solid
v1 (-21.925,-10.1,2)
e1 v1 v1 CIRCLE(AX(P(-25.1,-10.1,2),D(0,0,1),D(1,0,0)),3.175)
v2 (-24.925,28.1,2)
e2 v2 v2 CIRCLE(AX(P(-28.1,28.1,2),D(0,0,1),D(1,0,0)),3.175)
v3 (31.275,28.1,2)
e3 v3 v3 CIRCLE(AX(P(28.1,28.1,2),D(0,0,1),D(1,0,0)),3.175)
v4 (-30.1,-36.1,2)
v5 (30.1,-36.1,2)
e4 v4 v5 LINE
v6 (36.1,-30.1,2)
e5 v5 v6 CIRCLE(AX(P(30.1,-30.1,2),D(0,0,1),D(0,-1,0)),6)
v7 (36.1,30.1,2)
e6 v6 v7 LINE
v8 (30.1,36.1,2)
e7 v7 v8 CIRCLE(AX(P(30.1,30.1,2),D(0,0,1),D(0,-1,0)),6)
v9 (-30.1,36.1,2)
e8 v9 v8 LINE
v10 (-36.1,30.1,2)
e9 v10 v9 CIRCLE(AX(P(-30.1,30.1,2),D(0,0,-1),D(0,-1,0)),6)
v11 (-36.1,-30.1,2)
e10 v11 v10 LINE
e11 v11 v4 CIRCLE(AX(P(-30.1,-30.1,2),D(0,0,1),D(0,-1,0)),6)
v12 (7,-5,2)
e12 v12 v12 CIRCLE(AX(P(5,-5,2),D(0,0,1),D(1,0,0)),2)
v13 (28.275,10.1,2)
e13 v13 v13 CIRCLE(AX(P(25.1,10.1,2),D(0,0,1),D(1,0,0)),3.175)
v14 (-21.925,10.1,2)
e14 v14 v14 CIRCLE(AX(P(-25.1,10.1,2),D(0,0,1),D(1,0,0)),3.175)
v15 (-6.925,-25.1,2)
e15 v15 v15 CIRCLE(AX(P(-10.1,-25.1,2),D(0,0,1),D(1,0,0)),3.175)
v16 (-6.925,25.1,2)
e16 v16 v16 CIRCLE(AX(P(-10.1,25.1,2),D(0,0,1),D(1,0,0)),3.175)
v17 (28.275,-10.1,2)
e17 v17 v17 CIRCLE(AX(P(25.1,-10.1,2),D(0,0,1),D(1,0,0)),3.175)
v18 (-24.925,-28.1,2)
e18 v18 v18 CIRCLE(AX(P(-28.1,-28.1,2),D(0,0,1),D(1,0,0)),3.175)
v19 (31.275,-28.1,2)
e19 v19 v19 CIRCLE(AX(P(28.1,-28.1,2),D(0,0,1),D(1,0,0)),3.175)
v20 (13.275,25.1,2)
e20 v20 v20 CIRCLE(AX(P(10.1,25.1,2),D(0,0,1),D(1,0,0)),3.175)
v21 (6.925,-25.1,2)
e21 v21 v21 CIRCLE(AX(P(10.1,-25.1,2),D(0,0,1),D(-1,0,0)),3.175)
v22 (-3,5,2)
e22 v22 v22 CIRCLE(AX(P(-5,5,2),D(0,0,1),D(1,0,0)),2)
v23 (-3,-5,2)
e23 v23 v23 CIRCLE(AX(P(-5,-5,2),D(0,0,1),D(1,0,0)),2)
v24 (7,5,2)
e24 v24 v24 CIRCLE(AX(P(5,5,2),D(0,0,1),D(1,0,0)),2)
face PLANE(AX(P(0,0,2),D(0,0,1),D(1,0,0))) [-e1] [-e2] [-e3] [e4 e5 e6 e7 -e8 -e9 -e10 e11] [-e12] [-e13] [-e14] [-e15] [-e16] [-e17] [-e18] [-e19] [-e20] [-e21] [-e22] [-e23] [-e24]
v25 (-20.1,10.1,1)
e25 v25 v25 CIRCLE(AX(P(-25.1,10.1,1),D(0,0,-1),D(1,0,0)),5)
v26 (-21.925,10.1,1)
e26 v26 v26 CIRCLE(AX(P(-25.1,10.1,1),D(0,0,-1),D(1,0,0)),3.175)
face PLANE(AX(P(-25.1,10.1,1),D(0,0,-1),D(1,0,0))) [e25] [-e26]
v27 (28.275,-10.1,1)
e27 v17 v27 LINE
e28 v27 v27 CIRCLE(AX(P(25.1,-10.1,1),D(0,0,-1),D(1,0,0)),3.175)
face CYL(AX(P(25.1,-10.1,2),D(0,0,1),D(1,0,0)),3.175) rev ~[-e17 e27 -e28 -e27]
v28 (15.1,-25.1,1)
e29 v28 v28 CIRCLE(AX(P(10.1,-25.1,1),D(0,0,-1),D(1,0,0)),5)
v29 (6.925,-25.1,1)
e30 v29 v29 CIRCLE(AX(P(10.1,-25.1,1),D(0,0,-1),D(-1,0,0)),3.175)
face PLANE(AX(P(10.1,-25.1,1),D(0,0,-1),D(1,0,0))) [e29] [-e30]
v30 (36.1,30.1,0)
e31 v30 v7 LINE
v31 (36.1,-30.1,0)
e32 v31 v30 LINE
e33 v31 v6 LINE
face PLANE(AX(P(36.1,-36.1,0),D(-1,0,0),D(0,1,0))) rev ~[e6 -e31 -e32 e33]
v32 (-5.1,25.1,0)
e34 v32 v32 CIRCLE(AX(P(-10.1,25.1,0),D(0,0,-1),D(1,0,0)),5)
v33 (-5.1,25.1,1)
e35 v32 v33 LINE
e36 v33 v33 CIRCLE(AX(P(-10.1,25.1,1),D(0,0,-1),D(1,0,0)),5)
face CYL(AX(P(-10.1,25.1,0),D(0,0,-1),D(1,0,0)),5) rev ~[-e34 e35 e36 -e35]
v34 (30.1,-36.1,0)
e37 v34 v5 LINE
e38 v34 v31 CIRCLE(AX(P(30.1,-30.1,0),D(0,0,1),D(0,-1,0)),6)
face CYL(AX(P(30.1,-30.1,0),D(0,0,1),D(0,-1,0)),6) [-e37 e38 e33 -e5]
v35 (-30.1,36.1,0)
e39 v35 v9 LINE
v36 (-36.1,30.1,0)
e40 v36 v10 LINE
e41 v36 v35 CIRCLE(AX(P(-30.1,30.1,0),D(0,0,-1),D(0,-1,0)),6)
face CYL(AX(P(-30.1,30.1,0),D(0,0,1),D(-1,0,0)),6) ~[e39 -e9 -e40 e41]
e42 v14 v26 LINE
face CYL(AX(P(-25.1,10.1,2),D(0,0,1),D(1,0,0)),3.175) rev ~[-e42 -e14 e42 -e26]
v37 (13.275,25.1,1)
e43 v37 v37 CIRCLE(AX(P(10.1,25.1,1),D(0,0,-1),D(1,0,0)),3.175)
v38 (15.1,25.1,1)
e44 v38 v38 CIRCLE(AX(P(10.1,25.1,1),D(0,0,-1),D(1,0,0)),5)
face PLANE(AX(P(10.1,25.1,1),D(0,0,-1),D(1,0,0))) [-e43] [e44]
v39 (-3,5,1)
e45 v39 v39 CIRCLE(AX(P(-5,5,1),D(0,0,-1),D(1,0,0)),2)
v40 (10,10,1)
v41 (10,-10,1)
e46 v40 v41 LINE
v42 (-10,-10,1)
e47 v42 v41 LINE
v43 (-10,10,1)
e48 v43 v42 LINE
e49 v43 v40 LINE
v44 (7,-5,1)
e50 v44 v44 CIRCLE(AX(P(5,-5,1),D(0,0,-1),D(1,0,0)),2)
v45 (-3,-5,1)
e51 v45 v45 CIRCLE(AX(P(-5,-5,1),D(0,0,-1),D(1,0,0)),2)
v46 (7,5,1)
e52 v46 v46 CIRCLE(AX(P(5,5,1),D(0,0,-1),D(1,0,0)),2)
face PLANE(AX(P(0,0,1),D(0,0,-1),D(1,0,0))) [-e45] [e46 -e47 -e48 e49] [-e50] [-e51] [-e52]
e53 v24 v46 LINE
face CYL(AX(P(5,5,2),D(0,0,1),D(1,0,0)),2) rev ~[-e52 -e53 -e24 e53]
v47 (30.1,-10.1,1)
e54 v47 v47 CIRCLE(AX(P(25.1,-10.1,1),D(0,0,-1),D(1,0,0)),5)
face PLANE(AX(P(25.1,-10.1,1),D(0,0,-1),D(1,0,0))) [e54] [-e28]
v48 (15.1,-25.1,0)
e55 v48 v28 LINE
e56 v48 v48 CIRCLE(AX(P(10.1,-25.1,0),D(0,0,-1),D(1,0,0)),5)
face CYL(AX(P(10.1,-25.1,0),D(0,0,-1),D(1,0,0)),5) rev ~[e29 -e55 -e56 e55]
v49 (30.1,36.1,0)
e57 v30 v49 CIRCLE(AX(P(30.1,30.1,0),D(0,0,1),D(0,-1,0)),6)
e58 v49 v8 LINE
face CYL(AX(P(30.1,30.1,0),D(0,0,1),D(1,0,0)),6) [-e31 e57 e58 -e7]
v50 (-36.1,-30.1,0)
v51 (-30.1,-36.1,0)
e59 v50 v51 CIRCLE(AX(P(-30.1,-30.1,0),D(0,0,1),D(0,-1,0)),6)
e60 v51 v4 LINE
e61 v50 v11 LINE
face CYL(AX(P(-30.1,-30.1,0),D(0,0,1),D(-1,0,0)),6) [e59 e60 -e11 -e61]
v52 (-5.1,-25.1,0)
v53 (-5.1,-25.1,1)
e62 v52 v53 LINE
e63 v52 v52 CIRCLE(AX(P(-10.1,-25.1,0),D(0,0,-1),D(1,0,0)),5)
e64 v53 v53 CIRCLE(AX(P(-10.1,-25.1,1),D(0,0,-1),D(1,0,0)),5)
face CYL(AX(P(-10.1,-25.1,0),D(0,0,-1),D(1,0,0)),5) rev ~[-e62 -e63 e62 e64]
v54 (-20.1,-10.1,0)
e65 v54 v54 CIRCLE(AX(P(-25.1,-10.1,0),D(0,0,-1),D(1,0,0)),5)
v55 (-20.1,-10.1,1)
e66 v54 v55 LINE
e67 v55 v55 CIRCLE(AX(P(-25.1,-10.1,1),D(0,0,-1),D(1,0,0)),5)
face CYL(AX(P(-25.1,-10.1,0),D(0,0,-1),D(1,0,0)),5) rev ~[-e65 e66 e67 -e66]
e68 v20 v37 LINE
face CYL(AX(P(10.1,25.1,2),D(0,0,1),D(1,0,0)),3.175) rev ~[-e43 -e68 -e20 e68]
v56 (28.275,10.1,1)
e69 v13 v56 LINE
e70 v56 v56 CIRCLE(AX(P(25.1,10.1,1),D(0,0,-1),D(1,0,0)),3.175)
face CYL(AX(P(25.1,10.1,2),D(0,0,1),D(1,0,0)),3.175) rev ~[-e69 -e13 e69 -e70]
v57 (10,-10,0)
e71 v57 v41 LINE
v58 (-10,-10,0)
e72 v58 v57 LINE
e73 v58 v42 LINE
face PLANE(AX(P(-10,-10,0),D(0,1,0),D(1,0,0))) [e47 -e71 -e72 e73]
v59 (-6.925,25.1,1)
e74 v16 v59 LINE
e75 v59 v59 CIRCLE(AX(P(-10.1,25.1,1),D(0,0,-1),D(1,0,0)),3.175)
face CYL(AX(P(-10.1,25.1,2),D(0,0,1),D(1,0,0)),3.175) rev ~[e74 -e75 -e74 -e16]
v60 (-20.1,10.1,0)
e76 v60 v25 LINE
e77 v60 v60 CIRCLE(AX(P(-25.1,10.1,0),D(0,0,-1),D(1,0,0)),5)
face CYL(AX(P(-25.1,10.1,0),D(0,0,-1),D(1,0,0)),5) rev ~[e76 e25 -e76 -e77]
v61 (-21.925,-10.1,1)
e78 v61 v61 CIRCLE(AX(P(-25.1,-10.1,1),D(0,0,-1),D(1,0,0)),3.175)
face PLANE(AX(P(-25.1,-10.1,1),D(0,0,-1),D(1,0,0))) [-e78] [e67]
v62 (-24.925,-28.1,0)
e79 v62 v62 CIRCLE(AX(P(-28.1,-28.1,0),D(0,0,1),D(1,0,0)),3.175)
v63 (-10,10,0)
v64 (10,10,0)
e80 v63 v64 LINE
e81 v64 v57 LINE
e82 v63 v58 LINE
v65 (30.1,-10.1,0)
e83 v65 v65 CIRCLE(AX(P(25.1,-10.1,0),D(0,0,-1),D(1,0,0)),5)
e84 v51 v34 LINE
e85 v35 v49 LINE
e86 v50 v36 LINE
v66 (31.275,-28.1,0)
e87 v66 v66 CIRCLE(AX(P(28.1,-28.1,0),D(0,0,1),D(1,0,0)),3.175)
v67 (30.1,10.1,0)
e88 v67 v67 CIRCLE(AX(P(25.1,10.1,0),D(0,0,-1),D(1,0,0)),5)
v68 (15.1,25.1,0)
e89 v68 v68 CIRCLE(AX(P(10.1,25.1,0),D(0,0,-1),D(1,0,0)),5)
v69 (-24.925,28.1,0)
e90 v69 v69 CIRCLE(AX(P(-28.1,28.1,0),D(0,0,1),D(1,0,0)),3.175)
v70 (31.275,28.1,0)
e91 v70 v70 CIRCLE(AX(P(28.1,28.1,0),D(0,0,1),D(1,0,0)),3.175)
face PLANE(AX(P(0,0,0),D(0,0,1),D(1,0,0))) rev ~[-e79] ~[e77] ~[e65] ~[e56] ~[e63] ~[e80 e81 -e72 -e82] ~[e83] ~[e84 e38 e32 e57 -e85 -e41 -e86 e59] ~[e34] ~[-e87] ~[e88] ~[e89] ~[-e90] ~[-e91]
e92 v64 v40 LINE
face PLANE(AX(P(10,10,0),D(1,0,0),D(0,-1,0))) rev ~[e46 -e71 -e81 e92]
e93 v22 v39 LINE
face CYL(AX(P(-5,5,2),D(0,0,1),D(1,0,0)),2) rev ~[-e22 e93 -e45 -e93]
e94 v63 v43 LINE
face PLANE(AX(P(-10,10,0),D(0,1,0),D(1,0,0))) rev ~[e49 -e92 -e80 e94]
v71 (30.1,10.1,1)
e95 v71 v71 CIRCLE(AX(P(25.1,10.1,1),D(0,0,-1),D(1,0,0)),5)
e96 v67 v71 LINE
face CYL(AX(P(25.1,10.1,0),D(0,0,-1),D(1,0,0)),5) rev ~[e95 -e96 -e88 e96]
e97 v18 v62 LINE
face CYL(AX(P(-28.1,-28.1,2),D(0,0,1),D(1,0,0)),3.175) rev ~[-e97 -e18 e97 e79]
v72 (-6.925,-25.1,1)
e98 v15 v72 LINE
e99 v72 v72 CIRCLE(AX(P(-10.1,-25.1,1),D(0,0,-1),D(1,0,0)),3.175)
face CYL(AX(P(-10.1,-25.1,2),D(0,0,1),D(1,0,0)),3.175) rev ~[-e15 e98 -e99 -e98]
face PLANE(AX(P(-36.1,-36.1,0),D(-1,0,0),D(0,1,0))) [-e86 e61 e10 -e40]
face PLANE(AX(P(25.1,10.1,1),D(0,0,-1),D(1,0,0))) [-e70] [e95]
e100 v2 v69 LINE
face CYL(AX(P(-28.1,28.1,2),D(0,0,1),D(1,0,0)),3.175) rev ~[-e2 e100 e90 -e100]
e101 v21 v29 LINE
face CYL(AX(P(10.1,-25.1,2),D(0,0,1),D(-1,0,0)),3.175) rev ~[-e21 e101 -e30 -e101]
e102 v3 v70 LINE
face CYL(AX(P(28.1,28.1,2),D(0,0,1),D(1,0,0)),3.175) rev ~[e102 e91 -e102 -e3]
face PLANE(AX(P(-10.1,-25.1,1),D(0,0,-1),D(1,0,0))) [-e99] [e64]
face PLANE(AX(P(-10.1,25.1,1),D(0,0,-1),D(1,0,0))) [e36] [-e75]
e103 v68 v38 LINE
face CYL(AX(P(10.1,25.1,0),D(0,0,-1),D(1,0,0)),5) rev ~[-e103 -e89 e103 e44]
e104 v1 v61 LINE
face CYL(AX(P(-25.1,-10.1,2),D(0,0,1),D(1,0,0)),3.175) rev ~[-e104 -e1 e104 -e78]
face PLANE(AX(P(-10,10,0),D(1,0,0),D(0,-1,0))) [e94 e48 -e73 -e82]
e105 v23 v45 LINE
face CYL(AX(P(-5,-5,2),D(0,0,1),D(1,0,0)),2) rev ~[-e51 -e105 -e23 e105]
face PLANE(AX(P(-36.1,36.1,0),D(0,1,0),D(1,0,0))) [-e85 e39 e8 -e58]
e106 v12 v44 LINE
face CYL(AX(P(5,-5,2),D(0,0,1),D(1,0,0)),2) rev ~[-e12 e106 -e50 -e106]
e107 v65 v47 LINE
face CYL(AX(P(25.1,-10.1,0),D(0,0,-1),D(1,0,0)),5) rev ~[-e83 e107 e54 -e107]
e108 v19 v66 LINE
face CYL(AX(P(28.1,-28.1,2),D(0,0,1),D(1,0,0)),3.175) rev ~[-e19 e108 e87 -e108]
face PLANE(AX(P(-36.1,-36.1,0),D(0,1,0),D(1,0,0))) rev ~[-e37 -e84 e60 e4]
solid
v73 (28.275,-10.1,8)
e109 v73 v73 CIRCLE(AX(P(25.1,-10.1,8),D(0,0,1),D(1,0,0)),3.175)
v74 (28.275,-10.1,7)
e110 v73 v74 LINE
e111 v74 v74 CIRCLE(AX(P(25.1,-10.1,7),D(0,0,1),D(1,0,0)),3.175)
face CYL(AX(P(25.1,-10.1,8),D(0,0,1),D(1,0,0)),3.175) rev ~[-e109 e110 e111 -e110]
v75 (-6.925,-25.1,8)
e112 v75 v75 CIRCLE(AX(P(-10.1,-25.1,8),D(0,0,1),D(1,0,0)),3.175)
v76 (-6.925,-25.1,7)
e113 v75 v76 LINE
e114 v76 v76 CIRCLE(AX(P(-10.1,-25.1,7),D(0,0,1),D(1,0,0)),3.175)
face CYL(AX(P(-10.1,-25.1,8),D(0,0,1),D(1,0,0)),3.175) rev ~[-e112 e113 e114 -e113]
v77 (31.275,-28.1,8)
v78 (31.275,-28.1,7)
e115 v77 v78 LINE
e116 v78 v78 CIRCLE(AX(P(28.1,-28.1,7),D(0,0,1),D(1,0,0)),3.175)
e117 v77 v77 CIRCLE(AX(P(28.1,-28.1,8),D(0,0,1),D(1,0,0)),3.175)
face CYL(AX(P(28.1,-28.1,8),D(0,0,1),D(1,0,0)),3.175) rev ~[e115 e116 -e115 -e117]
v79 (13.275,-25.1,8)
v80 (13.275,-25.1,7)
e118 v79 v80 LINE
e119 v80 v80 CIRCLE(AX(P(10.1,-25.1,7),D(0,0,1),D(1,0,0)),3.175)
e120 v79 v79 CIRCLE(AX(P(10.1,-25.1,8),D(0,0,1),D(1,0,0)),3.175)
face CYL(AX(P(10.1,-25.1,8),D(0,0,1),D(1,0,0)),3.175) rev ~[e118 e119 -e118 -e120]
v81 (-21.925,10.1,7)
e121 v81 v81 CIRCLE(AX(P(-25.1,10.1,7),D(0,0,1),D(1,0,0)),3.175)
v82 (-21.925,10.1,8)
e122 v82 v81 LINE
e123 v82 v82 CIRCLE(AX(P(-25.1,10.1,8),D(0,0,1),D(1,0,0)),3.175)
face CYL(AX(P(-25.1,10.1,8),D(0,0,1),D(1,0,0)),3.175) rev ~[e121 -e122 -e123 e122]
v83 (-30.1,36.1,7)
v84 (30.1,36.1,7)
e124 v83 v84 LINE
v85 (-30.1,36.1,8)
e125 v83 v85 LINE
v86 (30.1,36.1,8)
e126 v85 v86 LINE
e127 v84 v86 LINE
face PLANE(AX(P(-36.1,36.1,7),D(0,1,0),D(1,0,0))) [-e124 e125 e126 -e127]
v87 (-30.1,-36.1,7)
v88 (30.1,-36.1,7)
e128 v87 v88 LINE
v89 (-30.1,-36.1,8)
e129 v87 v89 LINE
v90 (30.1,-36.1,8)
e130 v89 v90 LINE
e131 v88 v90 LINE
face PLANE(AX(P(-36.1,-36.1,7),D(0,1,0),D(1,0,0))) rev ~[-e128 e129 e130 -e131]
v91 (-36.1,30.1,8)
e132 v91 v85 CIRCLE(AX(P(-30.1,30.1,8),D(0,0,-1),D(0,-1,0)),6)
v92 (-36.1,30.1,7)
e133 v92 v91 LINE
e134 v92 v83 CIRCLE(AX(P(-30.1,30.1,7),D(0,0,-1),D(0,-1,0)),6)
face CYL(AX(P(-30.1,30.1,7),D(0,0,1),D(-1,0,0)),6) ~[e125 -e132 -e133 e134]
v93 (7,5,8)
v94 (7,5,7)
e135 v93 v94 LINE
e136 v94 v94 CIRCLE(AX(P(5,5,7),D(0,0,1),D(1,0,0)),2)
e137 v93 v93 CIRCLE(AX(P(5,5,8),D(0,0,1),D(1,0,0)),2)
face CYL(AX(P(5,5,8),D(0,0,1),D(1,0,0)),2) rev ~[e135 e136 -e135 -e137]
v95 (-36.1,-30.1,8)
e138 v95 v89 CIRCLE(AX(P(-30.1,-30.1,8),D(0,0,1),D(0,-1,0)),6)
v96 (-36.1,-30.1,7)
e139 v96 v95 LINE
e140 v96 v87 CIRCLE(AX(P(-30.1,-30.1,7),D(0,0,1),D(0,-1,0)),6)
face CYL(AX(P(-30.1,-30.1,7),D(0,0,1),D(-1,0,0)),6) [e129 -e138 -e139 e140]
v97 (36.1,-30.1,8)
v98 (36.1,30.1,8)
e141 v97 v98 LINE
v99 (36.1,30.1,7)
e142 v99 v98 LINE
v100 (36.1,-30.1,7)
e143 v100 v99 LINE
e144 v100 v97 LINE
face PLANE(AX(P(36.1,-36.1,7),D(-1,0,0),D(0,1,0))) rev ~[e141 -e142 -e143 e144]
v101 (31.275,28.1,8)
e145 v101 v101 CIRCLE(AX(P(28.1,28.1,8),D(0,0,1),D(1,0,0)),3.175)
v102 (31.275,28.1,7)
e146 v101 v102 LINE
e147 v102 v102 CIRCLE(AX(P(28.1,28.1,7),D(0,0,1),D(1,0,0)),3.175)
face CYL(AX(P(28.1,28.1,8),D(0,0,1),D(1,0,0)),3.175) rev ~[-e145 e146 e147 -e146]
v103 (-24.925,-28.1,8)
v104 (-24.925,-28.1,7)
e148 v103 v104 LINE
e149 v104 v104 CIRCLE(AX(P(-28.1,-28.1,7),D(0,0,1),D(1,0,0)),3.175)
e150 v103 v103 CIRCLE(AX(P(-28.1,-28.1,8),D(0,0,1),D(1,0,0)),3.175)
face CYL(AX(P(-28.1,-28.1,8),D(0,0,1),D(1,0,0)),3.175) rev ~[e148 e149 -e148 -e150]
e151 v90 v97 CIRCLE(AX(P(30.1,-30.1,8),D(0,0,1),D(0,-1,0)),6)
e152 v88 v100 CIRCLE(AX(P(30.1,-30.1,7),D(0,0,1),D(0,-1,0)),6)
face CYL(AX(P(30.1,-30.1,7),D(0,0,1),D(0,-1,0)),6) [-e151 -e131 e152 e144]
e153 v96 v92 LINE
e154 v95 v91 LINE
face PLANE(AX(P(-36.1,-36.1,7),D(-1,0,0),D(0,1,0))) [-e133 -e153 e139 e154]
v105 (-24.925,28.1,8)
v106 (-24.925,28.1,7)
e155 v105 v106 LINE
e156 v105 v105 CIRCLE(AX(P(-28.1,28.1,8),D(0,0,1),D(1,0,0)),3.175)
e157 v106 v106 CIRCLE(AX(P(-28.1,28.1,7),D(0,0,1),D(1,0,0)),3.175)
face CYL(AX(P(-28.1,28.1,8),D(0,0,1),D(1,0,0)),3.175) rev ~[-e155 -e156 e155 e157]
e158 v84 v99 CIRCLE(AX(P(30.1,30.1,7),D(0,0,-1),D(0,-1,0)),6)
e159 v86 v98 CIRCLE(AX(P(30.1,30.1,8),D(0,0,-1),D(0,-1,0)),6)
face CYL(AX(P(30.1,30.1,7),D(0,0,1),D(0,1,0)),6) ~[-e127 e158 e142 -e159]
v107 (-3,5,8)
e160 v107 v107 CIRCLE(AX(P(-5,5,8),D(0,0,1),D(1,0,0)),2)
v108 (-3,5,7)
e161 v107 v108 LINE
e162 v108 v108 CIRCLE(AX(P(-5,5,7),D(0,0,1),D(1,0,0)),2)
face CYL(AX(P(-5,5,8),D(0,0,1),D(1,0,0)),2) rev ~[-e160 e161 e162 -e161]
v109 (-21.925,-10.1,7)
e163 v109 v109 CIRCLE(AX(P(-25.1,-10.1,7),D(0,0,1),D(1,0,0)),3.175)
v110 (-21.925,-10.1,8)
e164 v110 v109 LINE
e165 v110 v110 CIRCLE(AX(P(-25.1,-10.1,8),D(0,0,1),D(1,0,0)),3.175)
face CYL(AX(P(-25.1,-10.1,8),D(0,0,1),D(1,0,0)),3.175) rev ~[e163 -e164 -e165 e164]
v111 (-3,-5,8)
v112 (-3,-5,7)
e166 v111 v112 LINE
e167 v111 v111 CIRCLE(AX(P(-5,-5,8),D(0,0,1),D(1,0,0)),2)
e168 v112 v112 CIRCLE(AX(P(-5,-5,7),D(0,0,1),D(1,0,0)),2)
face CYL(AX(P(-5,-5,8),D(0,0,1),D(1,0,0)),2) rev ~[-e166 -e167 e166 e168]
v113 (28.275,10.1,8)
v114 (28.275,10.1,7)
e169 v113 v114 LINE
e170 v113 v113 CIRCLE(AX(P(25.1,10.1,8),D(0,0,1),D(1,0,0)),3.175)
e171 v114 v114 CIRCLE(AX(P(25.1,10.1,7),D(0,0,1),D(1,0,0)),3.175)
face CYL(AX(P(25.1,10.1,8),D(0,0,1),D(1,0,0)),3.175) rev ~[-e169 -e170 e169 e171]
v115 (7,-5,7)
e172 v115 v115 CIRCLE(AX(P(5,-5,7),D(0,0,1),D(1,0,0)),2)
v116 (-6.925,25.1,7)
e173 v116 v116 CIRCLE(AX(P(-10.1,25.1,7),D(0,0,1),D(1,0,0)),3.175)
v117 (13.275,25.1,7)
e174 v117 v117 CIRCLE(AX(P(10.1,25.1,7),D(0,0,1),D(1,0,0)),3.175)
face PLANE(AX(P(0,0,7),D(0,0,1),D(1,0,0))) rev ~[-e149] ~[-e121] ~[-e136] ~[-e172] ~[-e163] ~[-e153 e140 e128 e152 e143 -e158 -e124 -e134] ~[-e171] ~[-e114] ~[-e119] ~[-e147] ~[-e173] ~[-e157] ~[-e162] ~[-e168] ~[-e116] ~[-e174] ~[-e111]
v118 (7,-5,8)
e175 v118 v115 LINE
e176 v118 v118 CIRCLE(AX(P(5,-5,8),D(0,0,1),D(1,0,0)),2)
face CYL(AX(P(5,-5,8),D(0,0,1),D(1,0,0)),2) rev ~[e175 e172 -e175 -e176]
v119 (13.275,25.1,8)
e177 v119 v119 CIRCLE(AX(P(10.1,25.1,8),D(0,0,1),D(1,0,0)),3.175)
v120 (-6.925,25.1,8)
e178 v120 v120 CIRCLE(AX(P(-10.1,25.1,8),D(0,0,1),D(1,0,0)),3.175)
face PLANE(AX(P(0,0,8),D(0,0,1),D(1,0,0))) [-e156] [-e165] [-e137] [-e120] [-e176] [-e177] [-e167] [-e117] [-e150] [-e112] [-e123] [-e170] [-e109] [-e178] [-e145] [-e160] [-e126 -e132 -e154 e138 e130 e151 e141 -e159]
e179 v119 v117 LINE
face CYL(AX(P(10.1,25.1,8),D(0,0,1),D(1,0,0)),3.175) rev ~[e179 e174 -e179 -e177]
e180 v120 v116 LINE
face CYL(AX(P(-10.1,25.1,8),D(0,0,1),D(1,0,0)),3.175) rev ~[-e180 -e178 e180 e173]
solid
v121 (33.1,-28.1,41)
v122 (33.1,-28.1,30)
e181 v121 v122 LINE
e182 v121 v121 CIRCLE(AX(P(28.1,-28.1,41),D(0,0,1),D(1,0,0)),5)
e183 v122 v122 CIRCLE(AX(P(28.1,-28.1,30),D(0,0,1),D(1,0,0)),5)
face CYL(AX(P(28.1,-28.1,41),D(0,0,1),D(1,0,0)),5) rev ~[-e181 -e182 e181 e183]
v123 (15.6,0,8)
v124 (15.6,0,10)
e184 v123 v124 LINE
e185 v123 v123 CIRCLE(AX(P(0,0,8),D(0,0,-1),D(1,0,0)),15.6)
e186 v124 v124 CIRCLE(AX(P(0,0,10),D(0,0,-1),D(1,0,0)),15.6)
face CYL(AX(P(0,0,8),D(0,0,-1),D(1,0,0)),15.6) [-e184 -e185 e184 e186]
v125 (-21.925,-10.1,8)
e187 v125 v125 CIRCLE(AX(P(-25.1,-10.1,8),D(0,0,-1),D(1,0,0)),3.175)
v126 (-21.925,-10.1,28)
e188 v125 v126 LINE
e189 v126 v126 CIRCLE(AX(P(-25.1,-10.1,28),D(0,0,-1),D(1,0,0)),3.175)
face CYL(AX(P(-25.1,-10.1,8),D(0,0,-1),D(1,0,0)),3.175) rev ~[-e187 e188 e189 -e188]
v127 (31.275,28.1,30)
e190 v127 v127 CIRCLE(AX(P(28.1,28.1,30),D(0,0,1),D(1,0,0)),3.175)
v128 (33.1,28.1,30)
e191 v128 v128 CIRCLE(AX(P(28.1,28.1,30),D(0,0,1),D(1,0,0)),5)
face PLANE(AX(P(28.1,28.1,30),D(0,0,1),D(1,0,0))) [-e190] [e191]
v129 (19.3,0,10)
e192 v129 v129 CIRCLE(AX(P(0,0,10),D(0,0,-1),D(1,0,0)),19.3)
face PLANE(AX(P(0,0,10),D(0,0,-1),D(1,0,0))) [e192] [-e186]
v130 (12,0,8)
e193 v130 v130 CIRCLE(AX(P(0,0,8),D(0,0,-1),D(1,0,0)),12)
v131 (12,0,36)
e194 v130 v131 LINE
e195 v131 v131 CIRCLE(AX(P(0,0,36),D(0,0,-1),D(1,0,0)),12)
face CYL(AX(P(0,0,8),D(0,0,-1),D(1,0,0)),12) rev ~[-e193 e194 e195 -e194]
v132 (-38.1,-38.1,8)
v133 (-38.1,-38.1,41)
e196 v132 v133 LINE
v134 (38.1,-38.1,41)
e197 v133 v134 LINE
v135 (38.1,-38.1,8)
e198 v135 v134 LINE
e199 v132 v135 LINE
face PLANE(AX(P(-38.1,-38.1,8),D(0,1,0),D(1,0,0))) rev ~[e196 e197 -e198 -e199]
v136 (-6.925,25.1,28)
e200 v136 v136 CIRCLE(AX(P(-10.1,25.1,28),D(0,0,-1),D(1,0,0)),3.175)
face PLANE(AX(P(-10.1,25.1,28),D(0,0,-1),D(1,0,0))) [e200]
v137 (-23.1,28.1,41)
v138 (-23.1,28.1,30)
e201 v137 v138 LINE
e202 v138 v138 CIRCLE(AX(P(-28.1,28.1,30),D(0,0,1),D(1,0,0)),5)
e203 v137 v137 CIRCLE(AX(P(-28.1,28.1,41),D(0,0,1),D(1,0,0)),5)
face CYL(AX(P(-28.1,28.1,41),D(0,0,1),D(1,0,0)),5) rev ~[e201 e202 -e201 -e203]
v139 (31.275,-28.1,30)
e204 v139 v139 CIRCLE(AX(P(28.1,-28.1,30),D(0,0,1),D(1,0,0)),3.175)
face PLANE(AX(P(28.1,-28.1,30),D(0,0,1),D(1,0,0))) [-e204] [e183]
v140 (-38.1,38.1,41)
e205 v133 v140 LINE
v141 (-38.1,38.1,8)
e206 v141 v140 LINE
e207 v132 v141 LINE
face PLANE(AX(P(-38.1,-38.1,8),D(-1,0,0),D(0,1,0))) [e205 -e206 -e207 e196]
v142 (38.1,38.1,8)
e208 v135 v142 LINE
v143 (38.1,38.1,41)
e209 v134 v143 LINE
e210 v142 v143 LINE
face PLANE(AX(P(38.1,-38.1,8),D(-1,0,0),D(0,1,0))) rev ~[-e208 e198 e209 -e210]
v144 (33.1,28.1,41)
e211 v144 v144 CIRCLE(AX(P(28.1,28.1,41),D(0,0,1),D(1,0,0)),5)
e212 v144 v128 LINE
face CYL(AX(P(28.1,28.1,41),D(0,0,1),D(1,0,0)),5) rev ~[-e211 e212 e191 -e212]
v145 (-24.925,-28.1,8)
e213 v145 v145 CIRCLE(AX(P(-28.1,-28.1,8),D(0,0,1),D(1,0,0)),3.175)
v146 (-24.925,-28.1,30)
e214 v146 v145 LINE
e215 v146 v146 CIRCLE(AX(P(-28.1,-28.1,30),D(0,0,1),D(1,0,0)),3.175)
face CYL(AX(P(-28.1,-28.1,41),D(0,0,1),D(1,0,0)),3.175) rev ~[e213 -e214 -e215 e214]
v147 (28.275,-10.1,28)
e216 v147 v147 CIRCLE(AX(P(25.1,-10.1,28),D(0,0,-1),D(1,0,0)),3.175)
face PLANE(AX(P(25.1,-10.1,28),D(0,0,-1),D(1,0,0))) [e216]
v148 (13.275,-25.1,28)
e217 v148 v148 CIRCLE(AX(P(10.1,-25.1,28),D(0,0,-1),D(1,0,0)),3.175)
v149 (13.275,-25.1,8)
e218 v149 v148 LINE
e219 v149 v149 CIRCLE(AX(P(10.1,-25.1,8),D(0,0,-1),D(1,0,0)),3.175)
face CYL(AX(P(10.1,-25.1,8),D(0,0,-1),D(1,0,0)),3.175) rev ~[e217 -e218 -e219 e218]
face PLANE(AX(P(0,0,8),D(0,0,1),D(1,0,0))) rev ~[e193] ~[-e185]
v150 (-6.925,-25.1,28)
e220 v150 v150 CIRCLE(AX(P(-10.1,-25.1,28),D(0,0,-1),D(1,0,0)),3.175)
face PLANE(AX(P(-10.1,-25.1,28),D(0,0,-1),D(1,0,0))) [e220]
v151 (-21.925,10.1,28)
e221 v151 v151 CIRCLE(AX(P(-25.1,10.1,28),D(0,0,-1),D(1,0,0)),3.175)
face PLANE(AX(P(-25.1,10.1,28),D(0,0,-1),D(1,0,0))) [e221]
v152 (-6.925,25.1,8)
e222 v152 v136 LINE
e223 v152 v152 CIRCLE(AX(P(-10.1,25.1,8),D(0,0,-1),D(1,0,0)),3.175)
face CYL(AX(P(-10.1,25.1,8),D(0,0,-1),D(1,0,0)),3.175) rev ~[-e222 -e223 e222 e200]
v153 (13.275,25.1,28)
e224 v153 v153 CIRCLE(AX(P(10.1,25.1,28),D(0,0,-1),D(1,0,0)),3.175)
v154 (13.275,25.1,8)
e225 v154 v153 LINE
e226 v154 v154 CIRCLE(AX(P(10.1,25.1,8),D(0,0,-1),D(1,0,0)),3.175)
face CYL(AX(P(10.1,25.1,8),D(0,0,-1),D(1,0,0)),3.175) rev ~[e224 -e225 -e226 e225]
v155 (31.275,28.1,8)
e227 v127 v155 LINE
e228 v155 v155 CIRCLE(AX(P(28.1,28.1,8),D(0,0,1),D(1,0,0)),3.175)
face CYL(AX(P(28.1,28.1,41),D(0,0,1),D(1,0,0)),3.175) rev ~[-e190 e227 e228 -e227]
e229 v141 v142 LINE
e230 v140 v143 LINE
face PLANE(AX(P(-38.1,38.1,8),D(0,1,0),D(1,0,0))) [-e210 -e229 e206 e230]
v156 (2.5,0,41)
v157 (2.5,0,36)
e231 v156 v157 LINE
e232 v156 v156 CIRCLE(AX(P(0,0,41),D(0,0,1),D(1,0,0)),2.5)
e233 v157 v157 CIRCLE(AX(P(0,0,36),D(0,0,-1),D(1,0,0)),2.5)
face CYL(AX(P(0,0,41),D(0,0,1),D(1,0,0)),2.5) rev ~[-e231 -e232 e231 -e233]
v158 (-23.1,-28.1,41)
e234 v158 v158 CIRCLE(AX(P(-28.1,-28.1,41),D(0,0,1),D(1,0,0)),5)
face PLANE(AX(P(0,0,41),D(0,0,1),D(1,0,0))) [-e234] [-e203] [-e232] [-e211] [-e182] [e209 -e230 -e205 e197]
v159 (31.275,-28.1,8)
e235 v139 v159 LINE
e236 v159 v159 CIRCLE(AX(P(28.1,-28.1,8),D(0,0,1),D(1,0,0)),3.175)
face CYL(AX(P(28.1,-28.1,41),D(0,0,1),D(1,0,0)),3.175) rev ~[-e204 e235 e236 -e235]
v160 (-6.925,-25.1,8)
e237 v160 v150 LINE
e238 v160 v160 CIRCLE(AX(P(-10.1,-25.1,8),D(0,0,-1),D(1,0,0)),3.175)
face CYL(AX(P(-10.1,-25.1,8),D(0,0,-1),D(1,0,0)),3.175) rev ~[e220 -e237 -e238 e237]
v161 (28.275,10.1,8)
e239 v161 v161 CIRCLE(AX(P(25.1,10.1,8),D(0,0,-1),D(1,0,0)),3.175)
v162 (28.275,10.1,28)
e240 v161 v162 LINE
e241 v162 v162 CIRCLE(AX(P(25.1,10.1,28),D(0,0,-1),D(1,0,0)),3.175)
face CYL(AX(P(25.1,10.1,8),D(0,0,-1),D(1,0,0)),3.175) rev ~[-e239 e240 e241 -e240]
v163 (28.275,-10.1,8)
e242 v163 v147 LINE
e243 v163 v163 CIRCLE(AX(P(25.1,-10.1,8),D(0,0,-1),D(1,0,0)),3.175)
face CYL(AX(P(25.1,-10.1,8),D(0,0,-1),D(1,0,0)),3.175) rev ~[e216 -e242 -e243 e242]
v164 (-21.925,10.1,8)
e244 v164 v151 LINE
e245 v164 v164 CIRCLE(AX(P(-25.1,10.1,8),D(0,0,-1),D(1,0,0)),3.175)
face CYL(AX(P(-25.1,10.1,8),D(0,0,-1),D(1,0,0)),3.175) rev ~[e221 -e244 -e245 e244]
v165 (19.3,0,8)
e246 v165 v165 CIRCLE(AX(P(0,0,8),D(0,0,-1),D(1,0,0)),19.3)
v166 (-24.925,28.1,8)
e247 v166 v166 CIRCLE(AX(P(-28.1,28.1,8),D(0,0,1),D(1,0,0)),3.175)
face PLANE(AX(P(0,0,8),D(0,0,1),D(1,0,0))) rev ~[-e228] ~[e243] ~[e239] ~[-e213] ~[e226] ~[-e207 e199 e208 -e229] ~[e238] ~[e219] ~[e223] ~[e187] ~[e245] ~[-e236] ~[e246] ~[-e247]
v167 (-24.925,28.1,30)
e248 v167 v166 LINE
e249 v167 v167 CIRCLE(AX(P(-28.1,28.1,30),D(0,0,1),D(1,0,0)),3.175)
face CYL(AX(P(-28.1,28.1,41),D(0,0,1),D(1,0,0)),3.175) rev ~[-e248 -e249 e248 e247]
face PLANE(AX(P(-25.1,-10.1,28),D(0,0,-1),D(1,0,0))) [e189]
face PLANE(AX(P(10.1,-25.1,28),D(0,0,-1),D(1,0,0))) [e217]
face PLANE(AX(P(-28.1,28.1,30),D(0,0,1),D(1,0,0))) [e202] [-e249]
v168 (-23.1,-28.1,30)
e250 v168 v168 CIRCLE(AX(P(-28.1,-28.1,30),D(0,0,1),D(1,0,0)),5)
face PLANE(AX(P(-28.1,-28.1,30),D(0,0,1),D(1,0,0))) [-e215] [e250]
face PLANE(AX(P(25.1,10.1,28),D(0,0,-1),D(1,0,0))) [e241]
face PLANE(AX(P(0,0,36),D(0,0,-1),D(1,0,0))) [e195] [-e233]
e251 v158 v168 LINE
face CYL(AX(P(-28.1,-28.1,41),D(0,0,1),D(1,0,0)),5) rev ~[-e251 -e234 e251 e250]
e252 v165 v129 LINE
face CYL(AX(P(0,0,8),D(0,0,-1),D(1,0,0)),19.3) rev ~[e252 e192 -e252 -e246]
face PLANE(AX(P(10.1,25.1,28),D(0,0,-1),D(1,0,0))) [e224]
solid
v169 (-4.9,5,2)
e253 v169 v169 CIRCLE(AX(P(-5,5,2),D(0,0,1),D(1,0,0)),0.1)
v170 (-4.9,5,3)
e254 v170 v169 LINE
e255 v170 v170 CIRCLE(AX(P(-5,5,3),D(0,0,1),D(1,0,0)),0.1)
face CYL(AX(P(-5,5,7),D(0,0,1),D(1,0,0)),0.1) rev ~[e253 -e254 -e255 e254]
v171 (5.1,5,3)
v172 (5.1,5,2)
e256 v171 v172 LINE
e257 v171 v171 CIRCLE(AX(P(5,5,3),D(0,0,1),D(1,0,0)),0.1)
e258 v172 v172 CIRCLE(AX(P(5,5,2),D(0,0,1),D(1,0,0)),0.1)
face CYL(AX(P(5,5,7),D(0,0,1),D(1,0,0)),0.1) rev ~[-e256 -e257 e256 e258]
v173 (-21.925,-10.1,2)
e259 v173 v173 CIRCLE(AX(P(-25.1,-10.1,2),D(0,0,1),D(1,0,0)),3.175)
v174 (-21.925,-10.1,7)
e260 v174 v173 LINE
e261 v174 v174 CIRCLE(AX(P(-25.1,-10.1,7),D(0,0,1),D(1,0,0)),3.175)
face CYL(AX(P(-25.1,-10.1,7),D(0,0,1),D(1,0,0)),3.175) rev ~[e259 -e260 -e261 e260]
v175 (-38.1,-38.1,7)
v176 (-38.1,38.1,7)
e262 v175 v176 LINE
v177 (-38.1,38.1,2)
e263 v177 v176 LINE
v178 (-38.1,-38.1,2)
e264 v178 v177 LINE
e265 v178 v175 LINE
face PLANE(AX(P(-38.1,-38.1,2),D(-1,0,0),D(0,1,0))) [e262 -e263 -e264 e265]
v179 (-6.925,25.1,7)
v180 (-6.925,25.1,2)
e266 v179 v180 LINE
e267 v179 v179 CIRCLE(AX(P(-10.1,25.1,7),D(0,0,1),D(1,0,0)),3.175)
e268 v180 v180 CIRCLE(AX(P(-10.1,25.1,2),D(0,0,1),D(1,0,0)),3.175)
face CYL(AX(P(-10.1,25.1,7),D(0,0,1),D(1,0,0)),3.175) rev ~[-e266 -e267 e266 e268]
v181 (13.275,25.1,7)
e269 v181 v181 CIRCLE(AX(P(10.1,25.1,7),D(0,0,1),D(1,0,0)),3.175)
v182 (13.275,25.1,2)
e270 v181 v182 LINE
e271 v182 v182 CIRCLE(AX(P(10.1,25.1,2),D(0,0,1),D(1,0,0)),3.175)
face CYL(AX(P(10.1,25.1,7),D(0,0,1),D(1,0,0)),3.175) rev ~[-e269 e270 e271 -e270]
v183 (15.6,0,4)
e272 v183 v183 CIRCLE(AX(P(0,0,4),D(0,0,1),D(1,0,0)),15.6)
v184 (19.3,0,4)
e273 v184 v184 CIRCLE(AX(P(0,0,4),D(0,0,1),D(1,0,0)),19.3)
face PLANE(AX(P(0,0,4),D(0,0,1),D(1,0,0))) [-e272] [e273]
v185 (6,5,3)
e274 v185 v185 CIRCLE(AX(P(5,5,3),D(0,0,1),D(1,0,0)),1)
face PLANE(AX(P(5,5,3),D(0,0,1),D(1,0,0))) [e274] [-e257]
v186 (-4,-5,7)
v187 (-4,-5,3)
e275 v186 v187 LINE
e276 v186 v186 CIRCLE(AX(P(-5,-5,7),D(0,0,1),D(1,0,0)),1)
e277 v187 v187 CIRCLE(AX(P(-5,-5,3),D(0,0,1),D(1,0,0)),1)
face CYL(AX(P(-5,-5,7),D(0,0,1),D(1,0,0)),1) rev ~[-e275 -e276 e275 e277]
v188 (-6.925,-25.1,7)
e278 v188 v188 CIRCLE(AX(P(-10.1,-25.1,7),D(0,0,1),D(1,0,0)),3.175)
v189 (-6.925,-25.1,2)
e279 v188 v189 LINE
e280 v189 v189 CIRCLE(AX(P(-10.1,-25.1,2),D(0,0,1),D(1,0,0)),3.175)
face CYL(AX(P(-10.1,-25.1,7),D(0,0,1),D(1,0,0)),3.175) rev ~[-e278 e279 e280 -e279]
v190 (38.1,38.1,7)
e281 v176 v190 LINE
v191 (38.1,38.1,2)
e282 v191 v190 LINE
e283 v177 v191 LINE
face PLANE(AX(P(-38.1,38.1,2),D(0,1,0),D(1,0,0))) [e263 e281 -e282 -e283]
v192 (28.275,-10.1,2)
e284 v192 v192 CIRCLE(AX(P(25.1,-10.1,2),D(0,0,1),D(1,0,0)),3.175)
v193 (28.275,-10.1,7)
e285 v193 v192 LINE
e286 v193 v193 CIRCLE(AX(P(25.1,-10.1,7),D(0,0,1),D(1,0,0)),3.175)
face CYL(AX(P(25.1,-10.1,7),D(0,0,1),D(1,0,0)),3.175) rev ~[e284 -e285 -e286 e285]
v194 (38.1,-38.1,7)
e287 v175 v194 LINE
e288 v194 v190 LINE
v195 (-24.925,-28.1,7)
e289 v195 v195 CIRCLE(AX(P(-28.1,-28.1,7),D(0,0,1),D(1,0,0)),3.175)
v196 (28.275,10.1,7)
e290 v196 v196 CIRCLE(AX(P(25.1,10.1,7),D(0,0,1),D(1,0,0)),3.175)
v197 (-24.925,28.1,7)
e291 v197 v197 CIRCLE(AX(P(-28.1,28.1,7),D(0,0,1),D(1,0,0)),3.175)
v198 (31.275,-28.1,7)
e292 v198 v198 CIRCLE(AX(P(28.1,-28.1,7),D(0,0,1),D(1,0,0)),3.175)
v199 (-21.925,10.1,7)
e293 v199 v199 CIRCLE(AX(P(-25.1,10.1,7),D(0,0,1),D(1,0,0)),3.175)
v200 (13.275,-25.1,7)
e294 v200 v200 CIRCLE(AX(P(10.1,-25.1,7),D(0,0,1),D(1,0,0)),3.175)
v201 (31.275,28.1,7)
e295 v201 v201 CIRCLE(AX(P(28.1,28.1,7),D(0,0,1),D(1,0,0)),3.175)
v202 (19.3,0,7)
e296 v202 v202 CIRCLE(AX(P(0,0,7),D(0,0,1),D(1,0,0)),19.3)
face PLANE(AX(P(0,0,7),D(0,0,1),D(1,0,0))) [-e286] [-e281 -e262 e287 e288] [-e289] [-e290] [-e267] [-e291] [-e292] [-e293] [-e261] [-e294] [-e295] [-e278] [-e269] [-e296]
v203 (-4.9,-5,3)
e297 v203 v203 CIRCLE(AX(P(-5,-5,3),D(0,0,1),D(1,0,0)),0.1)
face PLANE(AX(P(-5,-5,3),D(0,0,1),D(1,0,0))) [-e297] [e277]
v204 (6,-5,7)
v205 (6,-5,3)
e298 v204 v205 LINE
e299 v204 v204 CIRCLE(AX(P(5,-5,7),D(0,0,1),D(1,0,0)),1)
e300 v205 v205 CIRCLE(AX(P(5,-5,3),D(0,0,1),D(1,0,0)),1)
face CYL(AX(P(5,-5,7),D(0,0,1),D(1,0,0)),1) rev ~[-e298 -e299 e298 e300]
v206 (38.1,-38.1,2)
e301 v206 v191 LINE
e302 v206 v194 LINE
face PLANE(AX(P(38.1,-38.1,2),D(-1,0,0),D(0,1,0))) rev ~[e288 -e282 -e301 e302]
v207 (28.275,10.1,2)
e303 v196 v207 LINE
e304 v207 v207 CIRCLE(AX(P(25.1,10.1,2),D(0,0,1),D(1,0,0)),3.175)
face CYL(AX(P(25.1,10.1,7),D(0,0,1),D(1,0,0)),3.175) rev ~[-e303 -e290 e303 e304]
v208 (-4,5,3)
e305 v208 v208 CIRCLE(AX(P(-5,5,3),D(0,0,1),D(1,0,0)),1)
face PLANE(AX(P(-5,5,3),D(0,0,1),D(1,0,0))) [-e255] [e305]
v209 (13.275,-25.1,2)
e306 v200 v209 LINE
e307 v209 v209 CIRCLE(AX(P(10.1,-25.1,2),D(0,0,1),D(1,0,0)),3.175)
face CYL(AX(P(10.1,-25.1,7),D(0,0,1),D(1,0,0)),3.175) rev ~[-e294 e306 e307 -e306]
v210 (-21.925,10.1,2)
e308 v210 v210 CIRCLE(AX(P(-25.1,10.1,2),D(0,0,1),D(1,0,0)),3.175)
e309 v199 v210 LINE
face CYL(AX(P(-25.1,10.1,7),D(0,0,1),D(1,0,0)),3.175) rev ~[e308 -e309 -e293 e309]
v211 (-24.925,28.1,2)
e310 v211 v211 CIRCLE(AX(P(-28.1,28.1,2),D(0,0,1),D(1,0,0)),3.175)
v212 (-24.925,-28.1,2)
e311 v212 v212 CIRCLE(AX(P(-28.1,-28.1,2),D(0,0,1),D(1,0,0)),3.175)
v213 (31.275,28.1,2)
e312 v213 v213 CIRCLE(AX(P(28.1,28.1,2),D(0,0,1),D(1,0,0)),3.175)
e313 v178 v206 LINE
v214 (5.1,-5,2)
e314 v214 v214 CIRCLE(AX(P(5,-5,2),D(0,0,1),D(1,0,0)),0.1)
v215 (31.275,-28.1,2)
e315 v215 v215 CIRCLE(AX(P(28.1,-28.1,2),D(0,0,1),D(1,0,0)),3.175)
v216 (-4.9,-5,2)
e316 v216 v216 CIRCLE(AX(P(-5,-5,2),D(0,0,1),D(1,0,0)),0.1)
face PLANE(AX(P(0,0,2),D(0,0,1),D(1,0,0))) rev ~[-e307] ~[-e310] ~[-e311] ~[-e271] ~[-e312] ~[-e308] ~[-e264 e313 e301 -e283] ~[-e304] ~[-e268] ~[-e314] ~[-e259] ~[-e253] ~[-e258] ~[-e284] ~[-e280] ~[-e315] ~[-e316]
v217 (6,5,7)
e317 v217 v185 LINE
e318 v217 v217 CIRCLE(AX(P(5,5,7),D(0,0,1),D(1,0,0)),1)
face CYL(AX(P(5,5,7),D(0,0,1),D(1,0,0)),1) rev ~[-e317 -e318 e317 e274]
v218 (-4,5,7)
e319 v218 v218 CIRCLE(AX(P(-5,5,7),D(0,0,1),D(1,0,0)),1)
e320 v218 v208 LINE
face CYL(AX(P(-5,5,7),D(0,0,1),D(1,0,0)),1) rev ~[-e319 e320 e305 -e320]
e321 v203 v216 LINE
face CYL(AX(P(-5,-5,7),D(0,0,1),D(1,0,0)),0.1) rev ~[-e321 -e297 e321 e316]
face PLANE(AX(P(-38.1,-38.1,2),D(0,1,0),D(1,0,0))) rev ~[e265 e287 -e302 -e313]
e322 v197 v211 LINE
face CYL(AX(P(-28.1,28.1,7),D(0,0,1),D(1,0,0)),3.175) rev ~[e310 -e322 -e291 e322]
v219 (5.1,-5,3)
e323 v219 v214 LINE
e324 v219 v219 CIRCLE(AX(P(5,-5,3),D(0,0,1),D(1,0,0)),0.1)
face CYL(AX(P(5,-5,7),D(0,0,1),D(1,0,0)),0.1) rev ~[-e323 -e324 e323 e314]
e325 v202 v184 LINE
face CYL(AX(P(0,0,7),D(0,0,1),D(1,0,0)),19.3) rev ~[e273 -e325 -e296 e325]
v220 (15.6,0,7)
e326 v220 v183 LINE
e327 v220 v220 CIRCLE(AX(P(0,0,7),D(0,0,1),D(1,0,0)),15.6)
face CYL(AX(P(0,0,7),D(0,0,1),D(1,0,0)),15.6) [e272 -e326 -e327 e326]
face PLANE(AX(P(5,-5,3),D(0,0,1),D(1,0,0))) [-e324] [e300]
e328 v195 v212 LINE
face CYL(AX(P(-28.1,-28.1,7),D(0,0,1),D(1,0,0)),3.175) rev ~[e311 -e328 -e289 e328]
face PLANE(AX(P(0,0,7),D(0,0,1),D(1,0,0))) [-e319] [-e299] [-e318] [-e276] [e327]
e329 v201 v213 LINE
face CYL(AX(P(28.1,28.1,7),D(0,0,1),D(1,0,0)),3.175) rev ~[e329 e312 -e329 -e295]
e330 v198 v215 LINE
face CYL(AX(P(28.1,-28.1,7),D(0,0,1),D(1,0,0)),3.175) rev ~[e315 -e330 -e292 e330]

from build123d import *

# Parameters (mm, degrees)
F0_W      = 72.2
F0_H      = 72.2
F1_DEPTH  = 2
F2_R      = 6
F3_R      = 3.175
F3_R_2    = 2
F4_DEPTH  = 2.001
F5_R      = 5
F5_R_2    = 3.175
F5_W      = 20
F5_H      = 20
F5_R_3    = 2
F6_DEPTH  = 1
F8_W      = 76.2
F8_H      = 76.2
F9_DEPTH  = 5
F10_R     = 0.1
F10_R_2   = 3.175
F11_DEPTH = 7.001
F10_R_3   = 1
F12_DEPTH = 4
F10_R_4   = 19.3
F10_R_5   = 15.6
F13_DEPTH = 3
F15_W     = 72.2
F15_H     = 72.2
F16_DEPTH = 1
F17_R     = 3.175
F17_R_2   = 2
F18_DEPTH = 8.001
F19_R     = 6
F21_W     = 76.2
F21_H     = 76.2
F22_DEPTH = 33
F23_R     = 3.175
F23_R_2   = 2.5
F24_DEPTH = 41.001
F23_R_3   = 5
F25_DEPTH = 11
F26_R     = 3.175
F27_DEPTH = 20
F26_R_2   = 19.3
F26_R_3   = 15.6
F28_DEPTH = 2
F26_R_4   = 12
F26_R_5   = 2.5
F29_DEPTH = 28


with BuildPart() as f1:
    # F0 (on Top) → F1 (new body)
    with BuildSketch(Plane.XY):
        Rectangle(F0_W, F0_H)
    extrude(amount=F1_DEPTH)

    # F2
    f2_edges = [f1.edges().sort_by_distance(p)[0] for p in [
        (-36.1, -36.1, 1),
        (36.1, -36.1, 1),
        (-36.1, 36.1, 1),
        (36.1, 36.1, 1),
    ]]
    fillet(f2_edges, radius=F2_R)

    # F3 (on face) → F4 (cut, through all)
    with BuildSketch(Plane.XY.offset(2)):
        with Locations((-28.1, 28.1)):
            Circle(F3_R)
        with Locations((-10.1, 25.1)):
            Circle(F3_R)
        with Locations((10.1, 25.1)):
            Circle(F3_R)
        with Locations((28.1, 28.1)):
            Circle(F3_R)
        with Locations((-25.1, 10.1)):
            Circle(F3_R)
        with Locations((-5, 5)):
            Circle(F3_R_2)
        with Locations((5, 5)):
            Circle(F3_R_2)
        with Locations((25.1, 10.1)):
            Circle(F3_R)
        with Locations((25.1, -10.1)):
            Circle(F3_R)
        with Locations((5, -5)):
            Circle(F3_R_2)
        with Locations((-5, -5)):
            Circle(F3_R_2)
        with Locations((-25.1, -10.1)):
            Circle(F3_R)
        with Locations((-28.1, -28.1)):
            Circle(F3_R)
        with Locations((-10.1, -25.1)):
            Circle(F3_R)
        with BuildLine():
            ThreePointArc((13.275, -25.1), (10.1, -21.925), (6.925, -25.1))
            ThreePointArc((6.925, -25.1), (10.1, -28.275), (13.275, -25.1))
        make_face()
        with Locations((28.1, -28.1)):
            Circle(F3_R)
    extrude(amount=-F4_DEPTH, mode=Mode.SUBTRACT)

    # F5 (on face) → F6 (cut)
    with BuildSketch(Plane(origin=(0, 0, 0), x_dir=(1, 0, 0), z_dir=(0, 0, -1))):
        with Locations((-10.1, 25.1)):
            Circle(F5_R)
        with Locations((-10.1, 25.1)):
            Circle(F5_R_2, mode=Mode.SUBTRACT)
        with Locations((10.1, 25.1)):
            Circle(F5_R)
        with Locations((10.1, 25.1)):
            Circle(F5_R_2, mode=Mode.SUBTRACT)
        with Locations((25.1, 10.1)):
            Circle(F5_R)
        with Locations((25.1, 10.1)):
            Circle(F5_R_2, mode=Mode.SUBTRACT)
        with Locations((-25.1, 10.1)):
            Circle(F5_R)
        with Locations((-25.1, 10.1)):
            Circle(F5_R_2, mode=Mode.SUBTRACT)
        Rectangle(F5_W, F5_H)
        with Locations((-5, -5)):
            Circle(F5_R_3, mode=Mode.SUBTRACT)
        with Locations((5, -5)):
            Circle(F5_R_3, mode=Mode.SUBTRACT)
        with Locations((-5, 5)):
            Circle(F5_R_3, mode=Mode.SUBTRACT)
        with Locations((5, 5)):
            Circle(F5_R_3, mode=Mode.SUBTRACT)
        with Locations((-25.1, -10.1)):
            Circle(F5_R)
        with Locations((-25.1, -10.1)):
            Circle(F5_R_2, mode=Mode.SUBTRACT)
        with Locations((-10.1, -25.1)):
            Circle(F5_R)
        with Locations((-10.1, -25.1)):
            Circle(F5_R_2, mode=Mode.SUBTRACT)
        with Locations((10.1, -25.1)):
            Circle(F5_R)
        with Locations((10.1, -25.1)):
            Circle(F5_R_2, mode=Mode.SUBTRACT)
        with Locations((25.1, -10.1)):
            Circle(F5_R)
        with Locations((25.1, -10.1)):
            Circle(F5_R_2, mode=Mode.SUBTRACT)
    extrude(amount=-F6_DEPTH, mode=Mode.SUBTRACT)


with BuildPart() as f9:
    # F8 (on offset) → F9 (new body)
    with BuildSketch(Plane.XY.offset(2)):
        Rectangle(F8_W, F8_H)
    extrude(amount=F9_DEPTH)

    # F10 (on face) → F11 (cut, through all)
    with BuildSketch(Plane.XY.offset(7)):
        with Locations((-5, 5)):
            Circle(F10_R)
        with Locations((-5, -5)):
            Circle(F10_R)
        with Locations((5, -5)):
            Circle(F10_R)
        with Locations((5, 5)):
            Circle(F10_R)
        with Locations((-28.1, 28.1)):
            Circle(F10_R_2)
        with Locations((-10.1, 25.1)):
            Circle(F10_R_2)
        with Locations((10.1, 25.1)):
            Circle(F10_R_2)
        with Locations((28.1, 28.1)):
            Circle(F10_R_2)
        with Locations((25.1, 10.1)):
            Circle(F10_R_2)
        with Locations((25.1, -10.1)):
            Circle(F10_R_2)
        with Locations((28.1, -28.1)):
            Circle(F10_R_2)
        with Locations((10.1, -25.1)):
            Circle(F10_R_2)
        with Locations((-10.1, -25.1)):
            Circle(F10_R_2)
        with Locations((-28.1, -28.1)):
            Circle(F10_R_2)
        with Locations((-25.1, -10.1)):
            Circle(F10_R_2)
        with Locations((-25.1, 10.1)):
            Circle(F10_R_2)
    extrude(amount=-F11_DEPTH, mode=Mode.SUBTRACT)

    # F10 (on face) → F12 (cut)
    with BuildSketch(Plane.XY.offset(7)):
        with Locations((-5, 5)):
            Circle(F10_R_3)
        with Locations((-5, 5)):
            Circle(F10_R, mode=Mode.SUBTRACT)
        with Locations((5, 5)):
            Circle(F10_R_3)
        with Locations((5, 5)):
            Circle(F10_R, mode=Mode.SUBTRACT)
        with Locations((5, -5)):
            Circle(F10_R_3)
        with Locations((5, -5)):
            Circle(F10_R, mode=Mode.SUBTRACT)
        with Locations((-5, -5)):
            Circle(F10_R_3)
        with Locations((-5, -5)):
            Circle(F10_R, mode=Mode.SUBTRACT)
    extrude(amount=-F12_DEPTH, mode=Mode.SUBTRACT)

    # F10 (on face) → F13 (cut)
    with BuildSketch(Plane.XY.offset(7)):
        Circle(F10_R_4)
        Circle(F10_R_5, mode=Mode.SUBTRACT)
    extrude(amount=-F13_DEPTH, mode=Mode.SUBTRACT)


with BuildPart() as f16:
    # F15 (on offset) → F16 (new body)
    with BuildSketch(Plane.XY.offset(7)):
        Rectangle(F15_W, F15_H)
    extrude(amount=F16_DEPTH)

    # F17 (on face) → F18 (cut, through all)
    with BuildSketch(Plane.XY.offset(8)):
        with Locations((-10.1, 25.1)):
            Circle(F17_R)
        with Locations((-25.1, 10.1)):
            Circle(F17_R)
        with Locations((-5, -5)):
            Circle(F17_R_2)
        with Locations((25.1, -10.1)):
            Circle(F17_R)
        with Locations((-10.1, -25.1)):
            Circle(F17_R)
        with Locations((-28.1, 28.1)):
            Circle(F17_R)
        with Locations((10.1, 25.1)):
            Circle(F17_R)
        with Locations((28.1, 28.1)):
            Circle(F17_R)
        with Locations((25.1, 10.1)):
            Circle(F17_R)
        with Locations((5, 5)):
            Circle(F17_R_2)
        with Locations((-5, 5)):
            Circle(F17_R_2)
        with Locations((5, -5)):
            Circle(F17_R_2)
        with Locations((10.1, -25.1)):
            Circle(F17_R)
        with Locations((28.1, -28.1)):
            Circle(F17_R)
        with Locations((-28.1, -28.1)):
            Circle(F17_R)
        with Locations((-25.1, -10.1)):
            Circle(F17_R)
    extrude(amount=-F18_DEPTH, mode=Mode.SUBTRACT)

    # F19
    f19_edges = [f16.edges().sort_by_distance(p)[0] for p in [
        (-36.1, -36.1, 7.5),
        (36.1, -36.1, 7.5),
        (36.1, 36.1, 7.5),
        (-36.1, 36.1, 7.5),
    ]]
    fillet(f19_edges, radius=F19_R)


with BuildPart() as f22:
    # F21 (on offset) → F22 (new body)
    with BuildSketch(Plane.XY.offset(8)):
        Rectangle(F21_W, F21_H)
    extrude(amount=F22_DEPTH)

    # F23 (on face) → F24 (cut, through all)
    with BuildSketch(Plane.XY.offset(41)):
        with Locations((-28.1, 28.1)):
            Circle(F23_R)
        with Locations((28.1, 28.1)):
            Circle(F23_R)
        Circle(F23_R_2)
        with Locations((-28.1, -28.1)):
            Circle(F23_R)
        with Locations((28.1, -28.1)):
            Circle(F23_R)
    extrude(amount=-F24_DEPTH, mode=Mode.SUBTRACT)

    # F23 (on face) → F25 (cut)
    with BuildSketch(Plane.XY.offset(41)):
        with Locations((-28.1, 28.1)):
            Circle(F23_R_3)
        with Locations((-28.1, 28.1)):
            Circle(F23_R, mode=Mode.SUBTRACT)
        with Locations((28.1, 28.1)):
            Circle(F23_R_3)
        with Locations((28.1, 28.1)):
            Circle(F23_R, mode=Mode.SUBTRACT)
        with Locations((28.1, -28.1)):
            Circle(F23_R_3)
        with Locations((28.1, -28.1)):
            Circle(F23_R, mode=Mode.SUBTRACT)
        with Locations((-28.1, -28.1)):
            Circle(F23_R_3)
        with Locations((-28.1, -28.1)):
            Circle(F23_R, mode=Mode.SUBTRACT)
    extrude(amount=-F25_DEPTH, mode=Mode.SUBTRACT)

    # F26 (on face) → F27 (cut)
    with BuildSketch(Plane(origin=(0, 0, 8), x_dir=(1, 0, 0), z_dir=(0, 0, -1))):
        with Locations((-10.1, 25.1)):
            Circle(F26_R)
        with Locations((10.1, 25.1)):
            Circle(F26_R)
        with Locations((25.1, 10.1)):
            Circle(F26_R)
        with Locations((25.1, -10.1)):
            Circle(F26_R)
        with Locations((10.1, -25.1)):
            Circle(F26_R)
        with Locations((-10.1, -25.1)):
            Circle(F26_R)
        with Locations((-25.1, -10.1)):
            Circle(F26_R)
        with Locations((-25.1, 10.1)):
            Circle(F26_R)
    extrude(amount=-F27_DEPTH, mode=Mode.SUBTRACT)

    # F26 (on face) → F28 (cut)
    with BuildSketch(Plane(origin=(0, 0, 8), x_dir=(1, 0, 0), z_dir=(0, 0, -1))):
        Circle(F26_R_2)
        Circle(F26_R_3, mode=Mode.SUBTRACT)
    extrude(amount=-F28_DEPTH, mode=Mode.SUBTRACT)

    # F26 (on face) → F29 (cut)
    with BuildSketch(Plane(origin=(0, 0, 8), x_dir=(1, 0, 0), z_dir=(0, 0, -1))):
        Circle(F26_R_4)
        Circle(F26_R_5, mode=Mode.SUBTRACT)
    extrude(amount=-F29_DEPTH, mode=Mode.SUBTRACT)


solid = Compound([f1.part, f9.part, f16.part, f22.part])
